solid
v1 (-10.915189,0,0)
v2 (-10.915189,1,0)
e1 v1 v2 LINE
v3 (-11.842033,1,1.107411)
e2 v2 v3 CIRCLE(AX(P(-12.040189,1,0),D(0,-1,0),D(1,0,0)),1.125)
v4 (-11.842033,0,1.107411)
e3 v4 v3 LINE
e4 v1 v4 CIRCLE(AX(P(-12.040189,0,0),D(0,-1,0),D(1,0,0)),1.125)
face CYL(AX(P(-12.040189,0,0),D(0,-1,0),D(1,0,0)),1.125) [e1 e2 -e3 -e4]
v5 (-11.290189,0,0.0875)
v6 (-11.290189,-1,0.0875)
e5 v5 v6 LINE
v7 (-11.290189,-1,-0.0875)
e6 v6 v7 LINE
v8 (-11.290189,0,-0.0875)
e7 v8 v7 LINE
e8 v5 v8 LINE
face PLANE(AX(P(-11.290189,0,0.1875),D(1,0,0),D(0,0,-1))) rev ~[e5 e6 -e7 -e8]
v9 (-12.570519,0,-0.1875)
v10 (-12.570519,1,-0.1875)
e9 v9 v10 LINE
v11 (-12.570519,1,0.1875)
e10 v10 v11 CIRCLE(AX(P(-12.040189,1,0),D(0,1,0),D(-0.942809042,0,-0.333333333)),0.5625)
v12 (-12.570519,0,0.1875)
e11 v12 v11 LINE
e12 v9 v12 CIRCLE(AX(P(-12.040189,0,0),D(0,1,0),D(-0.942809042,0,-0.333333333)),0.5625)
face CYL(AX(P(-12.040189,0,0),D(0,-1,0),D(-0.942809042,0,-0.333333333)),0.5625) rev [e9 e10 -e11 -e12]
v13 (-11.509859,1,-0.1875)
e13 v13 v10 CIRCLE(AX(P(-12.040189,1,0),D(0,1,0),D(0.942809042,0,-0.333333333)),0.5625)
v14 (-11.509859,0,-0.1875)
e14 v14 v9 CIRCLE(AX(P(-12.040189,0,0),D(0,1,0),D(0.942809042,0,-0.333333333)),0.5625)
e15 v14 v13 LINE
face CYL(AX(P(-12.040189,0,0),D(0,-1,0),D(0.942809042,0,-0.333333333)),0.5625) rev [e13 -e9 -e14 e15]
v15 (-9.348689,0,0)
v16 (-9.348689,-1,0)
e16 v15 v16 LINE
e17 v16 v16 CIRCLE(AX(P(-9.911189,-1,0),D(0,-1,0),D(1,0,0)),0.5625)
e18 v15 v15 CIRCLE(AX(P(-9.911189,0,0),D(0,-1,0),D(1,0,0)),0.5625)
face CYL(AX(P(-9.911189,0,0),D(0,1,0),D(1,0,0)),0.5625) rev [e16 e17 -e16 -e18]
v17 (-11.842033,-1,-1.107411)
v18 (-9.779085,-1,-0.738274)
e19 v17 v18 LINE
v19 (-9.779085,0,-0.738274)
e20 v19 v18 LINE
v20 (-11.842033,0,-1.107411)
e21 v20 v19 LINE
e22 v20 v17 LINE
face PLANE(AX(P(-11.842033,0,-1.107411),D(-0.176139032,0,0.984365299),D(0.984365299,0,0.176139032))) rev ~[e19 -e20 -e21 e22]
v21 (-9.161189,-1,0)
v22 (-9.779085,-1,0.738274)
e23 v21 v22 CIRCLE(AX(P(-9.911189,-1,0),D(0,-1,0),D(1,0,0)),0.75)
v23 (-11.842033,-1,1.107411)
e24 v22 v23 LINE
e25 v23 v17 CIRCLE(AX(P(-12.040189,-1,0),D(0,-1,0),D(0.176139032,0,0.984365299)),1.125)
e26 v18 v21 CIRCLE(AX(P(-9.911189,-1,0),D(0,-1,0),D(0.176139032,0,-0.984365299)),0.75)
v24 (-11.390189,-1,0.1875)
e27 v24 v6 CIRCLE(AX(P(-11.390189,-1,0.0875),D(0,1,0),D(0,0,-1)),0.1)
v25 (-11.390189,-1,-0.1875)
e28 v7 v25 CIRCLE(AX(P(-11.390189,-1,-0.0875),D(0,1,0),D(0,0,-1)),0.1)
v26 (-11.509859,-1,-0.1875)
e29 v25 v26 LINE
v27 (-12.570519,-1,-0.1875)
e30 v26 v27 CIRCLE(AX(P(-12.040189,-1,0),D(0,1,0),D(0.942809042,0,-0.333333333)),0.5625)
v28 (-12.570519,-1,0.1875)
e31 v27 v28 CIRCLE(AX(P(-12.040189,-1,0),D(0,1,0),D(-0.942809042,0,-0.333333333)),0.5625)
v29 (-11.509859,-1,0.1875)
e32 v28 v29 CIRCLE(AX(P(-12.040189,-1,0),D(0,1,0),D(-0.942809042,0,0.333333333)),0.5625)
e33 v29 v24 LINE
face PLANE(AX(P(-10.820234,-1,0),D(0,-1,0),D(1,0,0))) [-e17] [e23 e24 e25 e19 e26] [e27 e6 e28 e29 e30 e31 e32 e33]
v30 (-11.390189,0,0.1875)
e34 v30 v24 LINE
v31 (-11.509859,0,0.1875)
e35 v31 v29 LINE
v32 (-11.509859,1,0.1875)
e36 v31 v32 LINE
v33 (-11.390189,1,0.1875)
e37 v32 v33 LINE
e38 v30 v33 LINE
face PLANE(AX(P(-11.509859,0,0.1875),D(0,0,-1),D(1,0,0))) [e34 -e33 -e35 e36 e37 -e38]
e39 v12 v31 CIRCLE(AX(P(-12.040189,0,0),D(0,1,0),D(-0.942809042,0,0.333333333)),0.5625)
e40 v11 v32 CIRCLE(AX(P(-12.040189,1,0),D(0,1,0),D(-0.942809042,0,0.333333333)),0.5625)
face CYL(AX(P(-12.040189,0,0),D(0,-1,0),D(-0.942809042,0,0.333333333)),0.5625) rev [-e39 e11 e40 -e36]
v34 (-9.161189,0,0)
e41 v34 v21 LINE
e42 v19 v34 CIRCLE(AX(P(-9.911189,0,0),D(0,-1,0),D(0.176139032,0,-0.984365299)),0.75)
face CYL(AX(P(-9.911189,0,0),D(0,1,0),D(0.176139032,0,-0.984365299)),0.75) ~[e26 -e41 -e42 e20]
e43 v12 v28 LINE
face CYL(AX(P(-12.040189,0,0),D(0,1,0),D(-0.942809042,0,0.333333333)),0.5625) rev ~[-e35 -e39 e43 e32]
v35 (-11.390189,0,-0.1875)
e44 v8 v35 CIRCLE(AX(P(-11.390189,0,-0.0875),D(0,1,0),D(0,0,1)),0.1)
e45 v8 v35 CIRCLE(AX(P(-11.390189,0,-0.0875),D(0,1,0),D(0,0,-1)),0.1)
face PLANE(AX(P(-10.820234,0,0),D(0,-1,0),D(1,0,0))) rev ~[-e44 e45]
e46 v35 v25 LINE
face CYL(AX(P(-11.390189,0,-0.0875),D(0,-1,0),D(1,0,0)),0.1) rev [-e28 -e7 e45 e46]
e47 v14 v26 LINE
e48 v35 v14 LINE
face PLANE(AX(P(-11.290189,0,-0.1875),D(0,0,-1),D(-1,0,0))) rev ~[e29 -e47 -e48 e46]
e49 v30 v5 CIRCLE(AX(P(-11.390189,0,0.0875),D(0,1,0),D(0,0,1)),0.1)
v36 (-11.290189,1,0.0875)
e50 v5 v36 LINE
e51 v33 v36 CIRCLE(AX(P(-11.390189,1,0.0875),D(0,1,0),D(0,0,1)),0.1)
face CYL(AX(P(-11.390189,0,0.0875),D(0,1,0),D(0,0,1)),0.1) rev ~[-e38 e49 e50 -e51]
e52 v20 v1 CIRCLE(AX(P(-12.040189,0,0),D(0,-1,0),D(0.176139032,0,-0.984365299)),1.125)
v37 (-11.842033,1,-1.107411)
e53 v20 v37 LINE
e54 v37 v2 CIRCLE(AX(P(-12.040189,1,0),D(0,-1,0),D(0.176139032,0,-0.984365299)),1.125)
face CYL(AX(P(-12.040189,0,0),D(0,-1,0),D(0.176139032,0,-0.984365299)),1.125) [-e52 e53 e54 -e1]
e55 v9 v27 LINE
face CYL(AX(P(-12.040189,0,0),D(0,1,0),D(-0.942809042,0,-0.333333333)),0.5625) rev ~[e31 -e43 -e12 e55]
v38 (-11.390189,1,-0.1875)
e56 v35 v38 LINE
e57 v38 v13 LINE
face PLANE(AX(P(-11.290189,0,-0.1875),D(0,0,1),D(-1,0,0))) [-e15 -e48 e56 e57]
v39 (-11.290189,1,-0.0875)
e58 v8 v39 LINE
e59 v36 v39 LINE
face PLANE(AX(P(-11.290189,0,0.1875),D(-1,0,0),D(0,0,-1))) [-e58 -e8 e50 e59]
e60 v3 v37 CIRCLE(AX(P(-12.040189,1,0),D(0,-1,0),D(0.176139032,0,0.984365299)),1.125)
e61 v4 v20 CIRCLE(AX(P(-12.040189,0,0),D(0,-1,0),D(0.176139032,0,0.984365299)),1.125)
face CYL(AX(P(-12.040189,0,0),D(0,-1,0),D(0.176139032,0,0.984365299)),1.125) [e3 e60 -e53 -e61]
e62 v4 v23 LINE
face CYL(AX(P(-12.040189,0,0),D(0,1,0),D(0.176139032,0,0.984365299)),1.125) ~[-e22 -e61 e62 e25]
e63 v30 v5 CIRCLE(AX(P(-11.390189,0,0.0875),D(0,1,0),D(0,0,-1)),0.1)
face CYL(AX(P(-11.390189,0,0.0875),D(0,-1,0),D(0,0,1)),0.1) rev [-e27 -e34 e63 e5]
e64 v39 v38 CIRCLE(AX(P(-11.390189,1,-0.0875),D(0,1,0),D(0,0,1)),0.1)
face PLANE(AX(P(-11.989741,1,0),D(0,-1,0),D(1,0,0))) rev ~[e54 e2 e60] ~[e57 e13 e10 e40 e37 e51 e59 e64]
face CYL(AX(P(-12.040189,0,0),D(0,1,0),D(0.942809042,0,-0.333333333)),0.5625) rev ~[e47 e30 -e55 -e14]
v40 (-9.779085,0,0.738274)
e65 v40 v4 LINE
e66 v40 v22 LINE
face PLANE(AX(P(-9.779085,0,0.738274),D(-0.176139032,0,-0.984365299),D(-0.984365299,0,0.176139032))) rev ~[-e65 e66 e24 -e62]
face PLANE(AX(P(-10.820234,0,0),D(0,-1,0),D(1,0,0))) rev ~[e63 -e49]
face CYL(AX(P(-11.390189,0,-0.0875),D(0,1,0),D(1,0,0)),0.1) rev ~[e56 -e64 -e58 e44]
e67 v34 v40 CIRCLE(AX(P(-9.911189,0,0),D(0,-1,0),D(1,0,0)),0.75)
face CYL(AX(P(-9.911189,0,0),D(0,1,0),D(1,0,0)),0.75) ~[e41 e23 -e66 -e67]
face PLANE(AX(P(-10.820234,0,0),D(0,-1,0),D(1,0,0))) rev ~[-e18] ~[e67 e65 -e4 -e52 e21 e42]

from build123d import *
from build123d import SkipClean  # not in build123d's __all__

# Parameters (mm, degrees)
F0_R     = 0.5625
F1_DEPTH = 1
F2_R     = 0.1
F3_DEPTH = 1
F4_R     = 0.1


with BuildPart() as f1:
    # F0 (on Front) → F1 (new body)
    with BuildSketch(Plane.XZ):
        with BuildLine():
            ThreePointArc((-11.8420327247, 1.107410961), (-11.1774751155, 0.7220453715), (-10.9151891362, 0))
            ThreePointArc((-10.9151891362, 0), (-11.1774751155, -0.7220453715), (-11.8420327247, -1.107410961))
            Line((-11.8420327247, -1.107410961), (-9.7790848619, -0.738273974))
            ThreePointArc((-9.7790848619, -0.738273974), (-10.6611891362, 0), (-9.7790848619, 0.738273974))
            Line((-9.7790848619, 0.738273974), (-11.8420327247, 1.107410961))
        make_face()
        with BuildLine():
            ThreePointArc((-9.1611891362, 0), (-9.3360464557, 0.481363581), (-9.7790848619, 0.738273974))
            ThreePointArc((-9.7790848619, 0.738273974), (-10.6611891362, 0), (-9.7790848619, -0.738273974))
            ThreePointArc((-9.7790848619, -0.738273974), (-9.3360464557, -0.481363581), (-9.1611891362, 0))
        make_face()
        with Locations((-9.9111891362, 0)):
            Circle(F0_R, mode=Mode.SUBTRACT)
        with BuildLine():
            ThreePointArc((-11.8420327247, -1.107410961), (-11.1774751155, -0.7220453715), (-10.9151891362, 0))
            ThreePointArc((-10.9151891362, 0), (-11.1774751155, 0.7220453715), (-11.8420327247, 1.107410961))
            ThreePointArc((-11.8420327247, 1.107410961), (-13.1651891362, 0), (-11.8420327247, -1.107410961))
        make_face()
        with BuildLine():
            ThreePointArc((-12.5705192221, 0.1875), (-12.0401891362, 0.5625), (-11.5098590503, 0.1875))
            Line((-11.5098590503, 0.1875), (-11.2901891362, 0.1875))
            Line((-11.2901891362, 0.1875), (-11.2901891362, -0.1875))
            Line((-11.2901891362, -0.1875), (-11.5098590503, -0.1875))
            ThreePointArc((-11.5098590503, -0.1875), (-12.0401891362, -0.5625), (-12.5705192221, -0.1875))
            Line((-12.5705192221, -0.1875), (-12.7901891362, -0.1875))
            Line((-12.7901891362, -0.1875), (-12.7901891362, 0.1875))
            Line((-12.7901891362, 0.1875), (-12.5705192221, 0.1875))
        make_face(mode=Mode.SUBTRACT)
        with BuildLine():
            ThreePointArc((-12.5705192221, -0.1875), (-12.6026891362, 0), (-12.5705192221, 0.1875))
            Line((-12.5705192221, 0.1875), (-12.7901891362, 0.1875))
            Line((-12.7901891362, 0.1875), (-12.7901891362, -0.1875))
            Line((-12.7901891362, -0.1875), (-12.5705192221, -0.1875))
        make_face()
    extrude(amount=F1_DEPTH)

    # F2
    f2_edges = [f1.edges().sort_by_distance(p)[0] for p in [
        (-11.290189, -0.5, 0.1875),
        (-11.290189, -0.5, -0.1875),
    ]]
    fillet(f2_edges, radius=F2_R)

    # F0 (on Front) → F3 (join)
    with BuildSketch(Plane.XZ):
        with BuildLine():
            ThreePointArc((-11.8420327247, -1.107410961), (-11.1774751155, -0.7220453715), (-10.9151891362, 0))
            ThreePointArc((-10.9151891362, 0), (-11.1774751155, 0.7220453715), (-11.8420327247, 1.107410961))
            ThreePointArc((-11.8420327247, 1.107410961), (-13.1651891362, 0), (-11.8420327247, -1.107410961))
        make_face()
        with BuildLine():
            ThreePointArc((-12.5705192221, 0.1875), (-12.0401891362, 0.5625), (-11.5098590503, 0.1875))
            Line((-11.5098590503, 0.1875), (-11.2901891362, 0.1875))
            Line((-11.2901891362, 0.1875), (-11.2901891362, -0.1875))
            Line((-11.2901891362, -0.1875), (-11.5098590503, -0.1875))
            ThreePointArc((-11.5098590503, -0.1875), (-12.0401891362, -0.5625), (-12.5705192221, -0.1875))
            Line((-12.5705192221, -0.1875), (-12.7901891362, -0.1875))
            Line((-12.7901891362, -0.1875), (-12.7901891362, 0.1875))
            Line((-12.7901891362, 0.1875), (-12.5705192221, 0.1875))
        make_face(mode=Mode.SUBTRACT)
        with BuildLine():
            ThreePointArc((-12.5705192221, -0.1875), (-12.6026891362, 0), (-12.5705192221, 0.1875))
            Line((-12.5705192221, 0.1875), (-12.7901891362, 0.1875))
            Line((-12.7901891362, 0.1875), (-12.7901891362, -0.1875))
            Line((-12.7901891362, -0.1875), (-12.5705192221, -0.1875))
        make_face()
    with SkipClean():  # cleaning this boolean's faces spoils the solid; the shape is the same uncleaned
        extrude(amount=-F3_DEPTH)

    # F4
    f4_edges = [f1.edges().sort_by_distance(p)[0] for p in [
        (-11.290189, 0.5, 0.1875),
        (-11.290189, 0.5, -0.1875),
    ]]
    fillet(f4_edges, radius=F4_R)


solid = f1.part
